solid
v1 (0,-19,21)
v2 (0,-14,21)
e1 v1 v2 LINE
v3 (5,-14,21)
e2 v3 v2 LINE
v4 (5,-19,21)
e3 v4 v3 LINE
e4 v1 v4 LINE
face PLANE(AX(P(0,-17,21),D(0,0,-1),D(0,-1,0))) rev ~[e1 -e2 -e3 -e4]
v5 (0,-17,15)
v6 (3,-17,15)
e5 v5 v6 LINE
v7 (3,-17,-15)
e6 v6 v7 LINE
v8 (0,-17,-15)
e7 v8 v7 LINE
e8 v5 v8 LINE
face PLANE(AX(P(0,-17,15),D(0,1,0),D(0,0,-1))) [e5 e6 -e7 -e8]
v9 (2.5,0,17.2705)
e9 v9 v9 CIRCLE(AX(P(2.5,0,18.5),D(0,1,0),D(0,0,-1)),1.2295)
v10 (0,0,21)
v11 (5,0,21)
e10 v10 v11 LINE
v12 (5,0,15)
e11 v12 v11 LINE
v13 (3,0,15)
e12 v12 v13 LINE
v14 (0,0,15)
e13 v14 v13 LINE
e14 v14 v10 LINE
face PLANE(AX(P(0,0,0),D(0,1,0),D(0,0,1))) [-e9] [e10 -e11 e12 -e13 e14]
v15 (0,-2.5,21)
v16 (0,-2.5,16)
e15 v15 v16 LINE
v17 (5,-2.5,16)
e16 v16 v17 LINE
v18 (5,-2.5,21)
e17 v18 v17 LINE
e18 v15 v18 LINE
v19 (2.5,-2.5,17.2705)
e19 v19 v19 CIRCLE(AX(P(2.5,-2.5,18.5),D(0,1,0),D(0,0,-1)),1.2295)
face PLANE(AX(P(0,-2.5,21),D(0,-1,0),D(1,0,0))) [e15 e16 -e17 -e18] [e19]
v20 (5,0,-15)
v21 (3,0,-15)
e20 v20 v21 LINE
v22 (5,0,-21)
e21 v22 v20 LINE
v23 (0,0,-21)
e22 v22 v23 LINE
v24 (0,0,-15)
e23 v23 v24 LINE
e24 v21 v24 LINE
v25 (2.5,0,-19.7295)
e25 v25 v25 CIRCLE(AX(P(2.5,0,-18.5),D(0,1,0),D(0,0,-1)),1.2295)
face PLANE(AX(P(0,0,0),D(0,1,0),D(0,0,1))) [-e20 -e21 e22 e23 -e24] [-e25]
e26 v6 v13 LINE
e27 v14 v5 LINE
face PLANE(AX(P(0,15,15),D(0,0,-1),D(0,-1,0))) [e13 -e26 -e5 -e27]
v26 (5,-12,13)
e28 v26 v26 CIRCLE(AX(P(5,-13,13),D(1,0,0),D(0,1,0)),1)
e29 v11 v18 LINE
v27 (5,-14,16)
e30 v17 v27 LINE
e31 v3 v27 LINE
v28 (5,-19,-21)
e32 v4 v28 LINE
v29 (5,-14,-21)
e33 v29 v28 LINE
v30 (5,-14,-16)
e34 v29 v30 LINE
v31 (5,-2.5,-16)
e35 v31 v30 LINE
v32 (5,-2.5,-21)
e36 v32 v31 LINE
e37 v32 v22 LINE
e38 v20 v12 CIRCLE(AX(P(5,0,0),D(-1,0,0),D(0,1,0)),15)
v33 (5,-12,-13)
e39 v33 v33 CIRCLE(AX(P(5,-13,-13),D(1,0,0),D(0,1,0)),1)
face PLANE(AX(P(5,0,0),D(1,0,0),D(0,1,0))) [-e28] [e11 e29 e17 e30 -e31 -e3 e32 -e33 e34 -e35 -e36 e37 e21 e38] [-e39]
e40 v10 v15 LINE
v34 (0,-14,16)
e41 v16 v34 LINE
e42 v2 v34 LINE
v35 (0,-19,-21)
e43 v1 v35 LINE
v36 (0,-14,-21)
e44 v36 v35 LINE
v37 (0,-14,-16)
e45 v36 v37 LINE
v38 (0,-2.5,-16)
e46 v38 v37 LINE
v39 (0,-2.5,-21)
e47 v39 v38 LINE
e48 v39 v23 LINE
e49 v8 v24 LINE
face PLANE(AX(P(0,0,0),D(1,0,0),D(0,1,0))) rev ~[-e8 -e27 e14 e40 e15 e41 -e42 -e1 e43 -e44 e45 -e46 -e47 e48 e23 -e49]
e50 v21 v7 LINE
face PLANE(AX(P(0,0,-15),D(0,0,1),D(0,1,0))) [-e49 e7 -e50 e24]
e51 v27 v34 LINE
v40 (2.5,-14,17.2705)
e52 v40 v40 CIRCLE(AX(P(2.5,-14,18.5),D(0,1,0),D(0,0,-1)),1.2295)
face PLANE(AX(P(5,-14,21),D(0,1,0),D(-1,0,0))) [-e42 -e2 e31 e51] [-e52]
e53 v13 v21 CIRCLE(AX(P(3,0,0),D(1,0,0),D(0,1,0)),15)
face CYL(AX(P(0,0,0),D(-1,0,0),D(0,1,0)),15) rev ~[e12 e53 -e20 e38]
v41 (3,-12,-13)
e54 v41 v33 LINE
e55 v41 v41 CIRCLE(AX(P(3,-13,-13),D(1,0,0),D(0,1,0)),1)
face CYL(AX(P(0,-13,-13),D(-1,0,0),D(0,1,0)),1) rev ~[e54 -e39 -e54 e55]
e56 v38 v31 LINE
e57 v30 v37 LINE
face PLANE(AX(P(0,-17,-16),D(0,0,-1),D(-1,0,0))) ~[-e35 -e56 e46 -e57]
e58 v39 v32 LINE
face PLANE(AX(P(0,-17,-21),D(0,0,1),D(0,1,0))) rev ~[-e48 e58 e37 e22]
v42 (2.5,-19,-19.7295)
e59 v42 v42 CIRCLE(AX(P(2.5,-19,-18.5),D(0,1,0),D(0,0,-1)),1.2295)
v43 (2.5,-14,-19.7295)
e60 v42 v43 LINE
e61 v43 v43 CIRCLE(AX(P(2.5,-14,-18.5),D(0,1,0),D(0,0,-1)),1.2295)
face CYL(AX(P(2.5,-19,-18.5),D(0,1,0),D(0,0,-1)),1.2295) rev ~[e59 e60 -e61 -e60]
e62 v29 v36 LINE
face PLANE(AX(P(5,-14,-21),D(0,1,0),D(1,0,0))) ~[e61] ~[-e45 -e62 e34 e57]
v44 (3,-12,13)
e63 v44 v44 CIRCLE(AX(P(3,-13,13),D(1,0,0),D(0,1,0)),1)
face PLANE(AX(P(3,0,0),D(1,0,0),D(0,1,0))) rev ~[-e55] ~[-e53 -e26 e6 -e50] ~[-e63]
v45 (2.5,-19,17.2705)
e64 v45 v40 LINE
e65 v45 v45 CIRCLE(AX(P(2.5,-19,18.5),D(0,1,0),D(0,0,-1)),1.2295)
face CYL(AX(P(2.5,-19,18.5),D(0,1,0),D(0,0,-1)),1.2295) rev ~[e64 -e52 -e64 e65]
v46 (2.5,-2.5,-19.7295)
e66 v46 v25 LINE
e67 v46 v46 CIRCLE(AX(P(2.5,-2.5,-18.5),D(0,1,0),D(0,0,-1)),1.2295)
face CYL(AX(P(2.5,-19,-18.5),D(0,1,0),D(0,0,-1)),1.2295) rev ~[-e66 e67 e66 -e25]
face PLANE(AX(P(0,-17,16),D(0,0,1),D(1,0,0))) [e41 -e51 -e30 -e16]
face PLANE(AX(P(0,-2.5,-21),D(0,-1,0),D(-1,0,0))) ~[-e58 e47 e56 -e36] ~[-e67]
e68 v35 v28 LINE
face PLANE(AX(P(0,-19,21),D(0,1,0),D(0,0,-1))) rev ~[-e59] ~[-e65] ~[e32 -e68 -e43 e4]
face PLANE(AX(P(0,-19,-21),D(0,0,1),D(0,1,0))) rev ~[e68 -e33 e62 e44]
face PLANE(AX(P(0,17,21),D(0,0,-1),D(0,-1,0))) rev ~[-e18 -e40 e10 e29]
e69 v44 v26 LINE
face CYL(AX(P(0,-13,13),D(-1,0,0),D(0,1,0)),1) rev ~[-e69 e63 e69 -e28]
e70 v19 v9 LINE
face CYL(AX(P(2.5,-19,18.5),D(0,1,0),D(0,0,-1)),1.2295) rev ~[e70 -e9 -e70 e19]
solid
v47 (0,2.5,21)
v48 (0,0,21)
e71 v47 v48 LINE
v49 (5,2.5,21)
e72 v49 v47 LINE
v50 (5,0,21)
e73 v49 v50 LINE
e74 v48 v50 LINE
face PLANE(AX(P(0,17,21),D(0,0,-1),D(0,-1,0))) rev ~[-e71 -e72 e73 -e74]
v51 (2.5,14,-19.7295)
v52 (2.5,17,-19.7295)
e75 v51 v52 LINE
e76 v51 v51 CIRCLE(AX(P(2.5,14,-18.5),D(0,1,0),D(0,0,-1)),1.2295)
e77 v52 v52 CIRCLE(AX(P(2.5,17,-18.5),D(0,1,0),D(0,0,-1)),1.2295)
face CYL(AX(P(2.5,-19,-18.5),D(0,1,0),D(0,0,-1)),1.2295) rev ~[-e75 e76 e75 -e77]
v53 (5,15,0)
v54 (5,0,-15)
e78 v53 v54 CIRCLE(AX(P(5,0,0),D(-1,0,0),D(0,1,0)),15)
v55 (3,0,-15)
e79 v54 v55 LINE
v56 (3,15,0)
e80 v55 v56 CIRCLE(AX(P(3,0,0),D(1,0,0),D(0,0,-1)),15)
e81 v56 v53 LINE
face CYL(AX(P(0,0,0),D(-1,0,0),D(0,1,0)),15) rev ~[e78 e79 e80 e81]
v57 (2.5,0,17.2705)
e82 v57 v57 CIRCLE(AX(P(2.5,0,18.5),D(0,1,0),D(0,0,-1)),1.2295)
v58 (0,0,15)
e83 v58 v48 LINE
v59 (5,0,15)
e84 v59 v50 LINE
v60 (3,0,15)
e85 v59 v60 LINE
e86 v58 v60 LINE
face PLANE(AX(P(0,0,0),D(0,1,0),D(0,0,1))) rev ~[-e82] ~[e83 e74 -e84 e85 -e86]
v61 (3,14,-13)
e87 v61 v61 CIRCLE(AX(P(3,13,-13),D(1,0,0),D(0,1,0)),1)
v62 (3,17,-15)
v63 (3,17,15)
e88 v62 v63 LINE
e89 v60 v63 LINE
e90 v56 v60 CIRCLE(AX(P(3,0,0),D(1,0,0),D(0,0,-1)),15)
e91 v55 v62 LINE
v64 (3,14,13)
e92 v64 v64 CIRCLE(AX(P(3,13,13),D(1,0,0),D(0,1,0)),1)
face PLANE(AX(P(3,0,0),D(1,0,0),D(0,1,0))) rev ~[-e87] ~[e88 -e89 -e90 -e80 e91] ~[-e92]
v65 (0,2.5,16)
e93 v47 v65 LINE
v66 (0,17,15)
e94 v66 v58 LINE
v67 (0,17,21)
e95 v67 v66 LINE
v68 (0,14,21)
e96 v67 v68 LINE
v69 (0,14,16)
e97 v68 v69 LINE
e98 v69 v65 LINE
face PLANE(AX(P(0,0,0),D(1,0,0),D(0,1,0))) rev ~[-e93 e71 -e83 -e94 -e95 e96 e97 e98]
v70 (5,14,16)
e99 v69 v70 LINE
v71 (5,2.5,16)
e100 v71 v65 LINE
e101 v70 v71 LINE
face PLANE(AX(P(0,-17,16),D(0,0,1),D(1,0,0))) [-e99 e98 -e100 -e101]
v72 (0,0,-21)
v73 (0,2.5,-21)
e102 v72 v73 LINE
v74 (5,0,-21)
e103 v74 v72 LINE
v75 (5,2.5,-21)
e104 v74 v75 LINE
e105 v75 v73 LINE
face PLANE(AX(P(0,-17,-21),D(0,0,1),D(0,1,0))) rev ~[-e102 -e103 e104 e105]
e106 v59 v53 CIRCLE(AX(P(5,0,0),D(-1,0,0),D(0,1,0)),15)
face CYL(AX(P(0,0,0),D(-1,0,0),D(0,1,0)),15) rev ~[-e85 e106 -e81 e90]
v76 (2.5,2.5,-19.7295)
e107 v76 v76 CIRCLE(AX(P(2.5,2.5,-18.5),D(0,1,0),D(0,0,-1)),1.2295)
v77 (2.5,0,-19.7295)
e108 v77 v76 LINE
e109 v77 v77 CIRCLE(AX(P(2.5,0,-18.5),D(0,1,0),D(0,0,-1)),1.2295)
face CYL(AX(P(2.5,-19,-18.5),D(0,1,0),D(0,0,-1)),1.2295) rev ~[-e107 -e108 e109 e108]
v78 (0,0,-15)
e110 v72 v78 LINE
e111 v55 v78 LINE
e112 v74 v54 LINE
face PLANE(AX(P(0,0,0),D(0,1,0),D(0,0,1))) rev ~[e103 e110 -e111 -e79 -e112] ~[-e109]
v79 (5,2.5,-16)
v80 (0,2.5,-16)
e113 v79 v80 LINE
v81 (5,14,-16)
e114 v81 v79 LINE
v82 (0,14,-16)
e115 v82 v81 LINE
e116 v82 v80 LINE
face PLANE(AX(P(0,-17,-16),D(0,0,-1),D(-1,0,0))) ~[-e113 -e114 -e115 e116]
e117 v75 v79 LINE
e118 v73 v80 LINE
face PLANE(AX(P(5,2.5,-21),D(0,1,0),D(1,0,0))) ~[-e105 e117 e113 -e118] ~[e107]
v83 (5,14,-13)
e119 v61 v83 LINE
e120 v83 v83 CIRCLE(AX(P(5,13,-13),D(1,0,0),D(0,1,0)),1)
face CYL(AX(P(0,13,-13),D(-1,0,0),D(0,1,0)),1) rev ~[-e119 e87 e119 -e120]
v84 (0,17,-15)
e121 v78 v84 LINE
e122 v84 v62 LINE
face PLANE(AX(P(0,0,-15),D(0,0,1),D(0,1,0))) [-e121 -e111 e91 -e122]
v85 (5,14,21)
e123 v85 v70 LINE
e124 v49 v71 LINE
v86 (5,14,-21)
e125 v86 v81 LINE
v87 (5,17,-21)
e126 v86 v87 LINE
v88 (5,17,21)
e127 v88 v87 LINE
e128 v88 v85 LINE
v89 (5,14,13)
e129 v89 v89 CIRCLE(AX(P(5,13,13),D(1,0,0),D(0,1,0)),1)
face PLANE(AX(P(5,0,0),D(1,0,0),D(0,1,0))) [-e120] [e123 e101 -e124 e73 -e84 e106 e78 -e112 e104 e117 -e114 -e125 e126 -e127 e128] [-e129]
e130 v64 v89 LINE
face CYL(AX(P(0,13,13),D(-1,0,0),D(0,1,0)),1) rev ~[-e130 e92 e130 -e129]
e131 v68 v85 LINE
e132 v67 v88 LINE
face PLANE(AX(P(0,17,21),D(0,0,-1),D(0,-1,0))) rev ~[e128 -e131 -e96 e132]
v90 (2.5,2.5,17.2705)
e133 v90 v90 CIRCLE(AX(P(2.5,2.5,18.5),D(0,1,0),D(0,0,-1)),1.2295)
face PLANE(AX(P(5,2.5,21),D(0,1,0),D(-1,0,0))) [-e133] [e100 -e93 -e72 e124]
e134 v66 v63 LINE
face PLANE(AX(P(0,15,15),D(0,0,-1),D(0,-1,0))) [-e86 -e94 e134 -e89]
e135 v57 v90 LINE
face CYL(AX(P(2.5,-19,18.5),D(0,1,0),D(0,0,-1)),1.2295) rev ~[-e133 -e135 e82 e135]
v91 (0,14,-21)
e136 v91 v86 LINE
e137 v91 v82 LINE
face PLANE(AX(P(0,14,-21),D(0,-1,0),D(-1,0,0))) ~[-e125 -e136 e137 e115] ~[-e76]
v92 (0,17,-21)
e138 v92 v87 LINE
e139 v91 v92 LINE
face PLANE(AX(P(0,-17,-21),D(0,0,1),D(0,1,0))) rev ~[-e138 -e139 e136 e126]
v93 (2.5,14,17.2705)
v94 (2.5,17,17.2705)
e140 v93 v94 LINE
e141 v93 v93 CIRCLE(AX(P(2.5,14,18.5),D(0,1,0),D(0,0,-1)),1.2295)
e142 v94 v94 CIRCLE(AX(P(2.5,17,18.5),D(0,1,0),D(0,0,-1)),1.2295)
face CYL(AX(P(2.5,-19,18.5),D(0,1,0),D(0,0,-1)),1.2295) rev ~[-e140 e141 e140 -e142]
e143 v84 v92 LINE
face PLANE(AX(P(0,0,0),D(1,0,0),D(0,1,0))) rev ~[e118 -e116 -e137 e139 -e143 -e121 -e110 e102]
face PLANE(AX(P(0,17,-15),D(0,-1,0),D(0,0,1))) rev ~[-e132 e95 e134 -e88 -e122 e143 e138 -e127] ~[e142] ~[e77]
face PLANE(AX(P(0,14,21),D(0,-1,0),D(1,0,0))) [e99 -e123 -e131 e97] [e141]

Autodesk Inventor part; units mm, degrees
ref_plane "YZ Plane" through (0, 0, 0) normal (1, 0, 0) x (0, 1, 0)
ref_plane "XZ Plane" through (0, 0, 0) normal (0, 1, 0) x (-1, 0, 0)
ref_plane "XY Plane" through (0, 0, 0) normal (0, 0, 1) x (1, 0, 0)
sketch "Sketch1" plane through (0, 0, 0) normal (1, 0, 0) x (0, 1, 0)
  circle A0 centre (0, 0) radius 15
  line L0 (15, 15) -> (-15, 15)
  line L1 (-15, 15) -> (-15, -15) construction
  line L2 (-15, -15) -> (15, -15)
  line L3 (15, -15) -> (15, 15) construction
  line L4 (15, 15) -> (-15, -15) construction
  line L5 (-15, 15) -> (15, -15) construction
  line L6 (17, 21) -> (-17, 21)
  line L7 (-17, 21) -> (-17, -21)
  line L8 (-17, -21) -> (17, -21)
  line L9 (17, -21) -> (17, 21)
  line L10 (17, 21) -> (-17, -21) construction
  line L11 (-17, 21) -> (17, -21) construction
  circle A1 centre (13, -13) radius 1
  circle A2 centre (13, 13) radius 1
  circle A3 centre (-13, -13) radius 1
  circle A4 centre (-13, 13) radius 1
  line L12 (17, -15) -> (15, -15)
  line L13 (-15, -15) -> (-17, -15)
  line L14 (17, 15) -> (15, 15)
  line L15 (-15, 15) -> (-17, 15)
  line L16 (-17, 21) -> (-19, 21)
  line L17 (-19, 21) -> (-19, -21)
  line L18 (-19, -21) -> (-17, -21)
  line L19 (-17, -21) -> (-17, 21)
  point P0 (0, -15)
  point P1 (0, 15)
  dimension "d0" = 30
  dimension "d1" = 42
  dimension "d2" = 34
  dimension "d10" = 2
  dimension "d11" = 2
  dimension "d14" = 26
  dimension "d17" = 26
  dimension "d44" = 2
sketch "Sketch2" plane through (0, 0, 0) normal (0, 1, 0) x (-1, 0, 0)
  line L0 (190, 50) -> (-10, 50)
  line L1 (-10, 50) -> (-10, -50)
  line L2 (-10, -50) -> (190, -50)
  line L3 (190, -50) -> (190, 50)
  point P0 (0, 0)
  point P1 (-10, 0)
  dimension "d3" = 200
  dimension "d4" = 100
  dimension "d5" = 10
extrude "Extrusion1" add sketch "Sketch1" along normal blind 5 contours A0 | A0 L0 L14 L9 L12 L2 | L0 L15 L7 L6 L9 L14 | A0 L2 L13 L7 L15 L0 | L2 L12 L9 L8 L7 L13 | A1 | A2 | A3 | A4
extrude "Extrusion4" cut sketch "Sketch1" along normal blind 3 contours A0 L0 L14 L9 L12 L2 | A0 L2 L13 L7 L15 L0
extrude "Extrusion3" cut sketch "Sketch1" along normal blind 5 contours A0 | A1 | A2 | A3 | A4
sketch "Sketch3" plane through (0, -17, 21) normal (0, 0, 1) x (1, 0, 0)
  line L0 (0, 34) -> (0, 0) projected
  line L1 (0, 0) -> (5, 0) projected
  line L2 (5, 34) -> (5, 0) projected
  line L3 (0, 0) -> (0, 34) projected
  line L4 (5, 0) -> (5, 34) projected
  line L5 (0, 14.5) -> (5, 14.5)
  line L6 (5, 14.5) -> (5, 3)
  line L7 (5, 3) -> (0, 3)
  line L8 (0, 3) -> (0, 14.5)
  line L9 (0, 31) -> (5, 31)
  line L10 (5, 31) -> (5, 19.5)
  line L11 (5, 19.5) -> (0, 19.5)
  line L12 (0, 19.5) -> (0, 31)
  line L13 (0, 34) -> (5, 34) projected
  point P0 (0, 17)
  point P1 (0, 17)
  point P2 (0, 3)
  point P3 (5, 3)
  point P4 (0, 19.5)
  dimension "d26" = 3
  dimension "d27" = 5
  dimension "d29" = 2.5
  dimension "d43" = 3
extrude "Extrusion5" cut sketch "Sketch3" against normal blind 5 contours L9 L2 L11 L0 | L5 L2 L7 L0
mirror "Mirror1" about plane through (0, 0, 0) normal (0, 0, 1) of "Extrusion5"
extrude "Extrusion6" add sketch "Sketch1" along normal blind 5 contours L7 L18 L17 L16
sketch "Sketch5" plane through (0, -19, -21) normal (0, -1, 0) x (1, 0, 0)
  line L0 (0, 42) -> (5, 42) projected
  line L1 (0, 42) -> (0, 0) projected
  line L2 (0, 0) -> (5, 0) projected
  point P0 (0, 21)
  point P1 (2.5, 2.5)
  point P2 (2.5, 39.5)
  dimension "d54" = 2.5
  dimension "d55" = 2.5
  dimension "d56" = 2.5
  dimension "d57" = 2.5
hole "Hole2" at (2.5, -19, -18.5) at (2.5, -19, 18.5) direction (0, 1, 0) diameter 2.459 end through all thread size "M3x0.5" class "6H" standard "ISO Metric profile"
split body "Split1" result two bodies by plane through (0, 0, 0) normal (0, 1, 0) first body at (4.5, 16.3333, 0)
properties part number "Camera holder2"
